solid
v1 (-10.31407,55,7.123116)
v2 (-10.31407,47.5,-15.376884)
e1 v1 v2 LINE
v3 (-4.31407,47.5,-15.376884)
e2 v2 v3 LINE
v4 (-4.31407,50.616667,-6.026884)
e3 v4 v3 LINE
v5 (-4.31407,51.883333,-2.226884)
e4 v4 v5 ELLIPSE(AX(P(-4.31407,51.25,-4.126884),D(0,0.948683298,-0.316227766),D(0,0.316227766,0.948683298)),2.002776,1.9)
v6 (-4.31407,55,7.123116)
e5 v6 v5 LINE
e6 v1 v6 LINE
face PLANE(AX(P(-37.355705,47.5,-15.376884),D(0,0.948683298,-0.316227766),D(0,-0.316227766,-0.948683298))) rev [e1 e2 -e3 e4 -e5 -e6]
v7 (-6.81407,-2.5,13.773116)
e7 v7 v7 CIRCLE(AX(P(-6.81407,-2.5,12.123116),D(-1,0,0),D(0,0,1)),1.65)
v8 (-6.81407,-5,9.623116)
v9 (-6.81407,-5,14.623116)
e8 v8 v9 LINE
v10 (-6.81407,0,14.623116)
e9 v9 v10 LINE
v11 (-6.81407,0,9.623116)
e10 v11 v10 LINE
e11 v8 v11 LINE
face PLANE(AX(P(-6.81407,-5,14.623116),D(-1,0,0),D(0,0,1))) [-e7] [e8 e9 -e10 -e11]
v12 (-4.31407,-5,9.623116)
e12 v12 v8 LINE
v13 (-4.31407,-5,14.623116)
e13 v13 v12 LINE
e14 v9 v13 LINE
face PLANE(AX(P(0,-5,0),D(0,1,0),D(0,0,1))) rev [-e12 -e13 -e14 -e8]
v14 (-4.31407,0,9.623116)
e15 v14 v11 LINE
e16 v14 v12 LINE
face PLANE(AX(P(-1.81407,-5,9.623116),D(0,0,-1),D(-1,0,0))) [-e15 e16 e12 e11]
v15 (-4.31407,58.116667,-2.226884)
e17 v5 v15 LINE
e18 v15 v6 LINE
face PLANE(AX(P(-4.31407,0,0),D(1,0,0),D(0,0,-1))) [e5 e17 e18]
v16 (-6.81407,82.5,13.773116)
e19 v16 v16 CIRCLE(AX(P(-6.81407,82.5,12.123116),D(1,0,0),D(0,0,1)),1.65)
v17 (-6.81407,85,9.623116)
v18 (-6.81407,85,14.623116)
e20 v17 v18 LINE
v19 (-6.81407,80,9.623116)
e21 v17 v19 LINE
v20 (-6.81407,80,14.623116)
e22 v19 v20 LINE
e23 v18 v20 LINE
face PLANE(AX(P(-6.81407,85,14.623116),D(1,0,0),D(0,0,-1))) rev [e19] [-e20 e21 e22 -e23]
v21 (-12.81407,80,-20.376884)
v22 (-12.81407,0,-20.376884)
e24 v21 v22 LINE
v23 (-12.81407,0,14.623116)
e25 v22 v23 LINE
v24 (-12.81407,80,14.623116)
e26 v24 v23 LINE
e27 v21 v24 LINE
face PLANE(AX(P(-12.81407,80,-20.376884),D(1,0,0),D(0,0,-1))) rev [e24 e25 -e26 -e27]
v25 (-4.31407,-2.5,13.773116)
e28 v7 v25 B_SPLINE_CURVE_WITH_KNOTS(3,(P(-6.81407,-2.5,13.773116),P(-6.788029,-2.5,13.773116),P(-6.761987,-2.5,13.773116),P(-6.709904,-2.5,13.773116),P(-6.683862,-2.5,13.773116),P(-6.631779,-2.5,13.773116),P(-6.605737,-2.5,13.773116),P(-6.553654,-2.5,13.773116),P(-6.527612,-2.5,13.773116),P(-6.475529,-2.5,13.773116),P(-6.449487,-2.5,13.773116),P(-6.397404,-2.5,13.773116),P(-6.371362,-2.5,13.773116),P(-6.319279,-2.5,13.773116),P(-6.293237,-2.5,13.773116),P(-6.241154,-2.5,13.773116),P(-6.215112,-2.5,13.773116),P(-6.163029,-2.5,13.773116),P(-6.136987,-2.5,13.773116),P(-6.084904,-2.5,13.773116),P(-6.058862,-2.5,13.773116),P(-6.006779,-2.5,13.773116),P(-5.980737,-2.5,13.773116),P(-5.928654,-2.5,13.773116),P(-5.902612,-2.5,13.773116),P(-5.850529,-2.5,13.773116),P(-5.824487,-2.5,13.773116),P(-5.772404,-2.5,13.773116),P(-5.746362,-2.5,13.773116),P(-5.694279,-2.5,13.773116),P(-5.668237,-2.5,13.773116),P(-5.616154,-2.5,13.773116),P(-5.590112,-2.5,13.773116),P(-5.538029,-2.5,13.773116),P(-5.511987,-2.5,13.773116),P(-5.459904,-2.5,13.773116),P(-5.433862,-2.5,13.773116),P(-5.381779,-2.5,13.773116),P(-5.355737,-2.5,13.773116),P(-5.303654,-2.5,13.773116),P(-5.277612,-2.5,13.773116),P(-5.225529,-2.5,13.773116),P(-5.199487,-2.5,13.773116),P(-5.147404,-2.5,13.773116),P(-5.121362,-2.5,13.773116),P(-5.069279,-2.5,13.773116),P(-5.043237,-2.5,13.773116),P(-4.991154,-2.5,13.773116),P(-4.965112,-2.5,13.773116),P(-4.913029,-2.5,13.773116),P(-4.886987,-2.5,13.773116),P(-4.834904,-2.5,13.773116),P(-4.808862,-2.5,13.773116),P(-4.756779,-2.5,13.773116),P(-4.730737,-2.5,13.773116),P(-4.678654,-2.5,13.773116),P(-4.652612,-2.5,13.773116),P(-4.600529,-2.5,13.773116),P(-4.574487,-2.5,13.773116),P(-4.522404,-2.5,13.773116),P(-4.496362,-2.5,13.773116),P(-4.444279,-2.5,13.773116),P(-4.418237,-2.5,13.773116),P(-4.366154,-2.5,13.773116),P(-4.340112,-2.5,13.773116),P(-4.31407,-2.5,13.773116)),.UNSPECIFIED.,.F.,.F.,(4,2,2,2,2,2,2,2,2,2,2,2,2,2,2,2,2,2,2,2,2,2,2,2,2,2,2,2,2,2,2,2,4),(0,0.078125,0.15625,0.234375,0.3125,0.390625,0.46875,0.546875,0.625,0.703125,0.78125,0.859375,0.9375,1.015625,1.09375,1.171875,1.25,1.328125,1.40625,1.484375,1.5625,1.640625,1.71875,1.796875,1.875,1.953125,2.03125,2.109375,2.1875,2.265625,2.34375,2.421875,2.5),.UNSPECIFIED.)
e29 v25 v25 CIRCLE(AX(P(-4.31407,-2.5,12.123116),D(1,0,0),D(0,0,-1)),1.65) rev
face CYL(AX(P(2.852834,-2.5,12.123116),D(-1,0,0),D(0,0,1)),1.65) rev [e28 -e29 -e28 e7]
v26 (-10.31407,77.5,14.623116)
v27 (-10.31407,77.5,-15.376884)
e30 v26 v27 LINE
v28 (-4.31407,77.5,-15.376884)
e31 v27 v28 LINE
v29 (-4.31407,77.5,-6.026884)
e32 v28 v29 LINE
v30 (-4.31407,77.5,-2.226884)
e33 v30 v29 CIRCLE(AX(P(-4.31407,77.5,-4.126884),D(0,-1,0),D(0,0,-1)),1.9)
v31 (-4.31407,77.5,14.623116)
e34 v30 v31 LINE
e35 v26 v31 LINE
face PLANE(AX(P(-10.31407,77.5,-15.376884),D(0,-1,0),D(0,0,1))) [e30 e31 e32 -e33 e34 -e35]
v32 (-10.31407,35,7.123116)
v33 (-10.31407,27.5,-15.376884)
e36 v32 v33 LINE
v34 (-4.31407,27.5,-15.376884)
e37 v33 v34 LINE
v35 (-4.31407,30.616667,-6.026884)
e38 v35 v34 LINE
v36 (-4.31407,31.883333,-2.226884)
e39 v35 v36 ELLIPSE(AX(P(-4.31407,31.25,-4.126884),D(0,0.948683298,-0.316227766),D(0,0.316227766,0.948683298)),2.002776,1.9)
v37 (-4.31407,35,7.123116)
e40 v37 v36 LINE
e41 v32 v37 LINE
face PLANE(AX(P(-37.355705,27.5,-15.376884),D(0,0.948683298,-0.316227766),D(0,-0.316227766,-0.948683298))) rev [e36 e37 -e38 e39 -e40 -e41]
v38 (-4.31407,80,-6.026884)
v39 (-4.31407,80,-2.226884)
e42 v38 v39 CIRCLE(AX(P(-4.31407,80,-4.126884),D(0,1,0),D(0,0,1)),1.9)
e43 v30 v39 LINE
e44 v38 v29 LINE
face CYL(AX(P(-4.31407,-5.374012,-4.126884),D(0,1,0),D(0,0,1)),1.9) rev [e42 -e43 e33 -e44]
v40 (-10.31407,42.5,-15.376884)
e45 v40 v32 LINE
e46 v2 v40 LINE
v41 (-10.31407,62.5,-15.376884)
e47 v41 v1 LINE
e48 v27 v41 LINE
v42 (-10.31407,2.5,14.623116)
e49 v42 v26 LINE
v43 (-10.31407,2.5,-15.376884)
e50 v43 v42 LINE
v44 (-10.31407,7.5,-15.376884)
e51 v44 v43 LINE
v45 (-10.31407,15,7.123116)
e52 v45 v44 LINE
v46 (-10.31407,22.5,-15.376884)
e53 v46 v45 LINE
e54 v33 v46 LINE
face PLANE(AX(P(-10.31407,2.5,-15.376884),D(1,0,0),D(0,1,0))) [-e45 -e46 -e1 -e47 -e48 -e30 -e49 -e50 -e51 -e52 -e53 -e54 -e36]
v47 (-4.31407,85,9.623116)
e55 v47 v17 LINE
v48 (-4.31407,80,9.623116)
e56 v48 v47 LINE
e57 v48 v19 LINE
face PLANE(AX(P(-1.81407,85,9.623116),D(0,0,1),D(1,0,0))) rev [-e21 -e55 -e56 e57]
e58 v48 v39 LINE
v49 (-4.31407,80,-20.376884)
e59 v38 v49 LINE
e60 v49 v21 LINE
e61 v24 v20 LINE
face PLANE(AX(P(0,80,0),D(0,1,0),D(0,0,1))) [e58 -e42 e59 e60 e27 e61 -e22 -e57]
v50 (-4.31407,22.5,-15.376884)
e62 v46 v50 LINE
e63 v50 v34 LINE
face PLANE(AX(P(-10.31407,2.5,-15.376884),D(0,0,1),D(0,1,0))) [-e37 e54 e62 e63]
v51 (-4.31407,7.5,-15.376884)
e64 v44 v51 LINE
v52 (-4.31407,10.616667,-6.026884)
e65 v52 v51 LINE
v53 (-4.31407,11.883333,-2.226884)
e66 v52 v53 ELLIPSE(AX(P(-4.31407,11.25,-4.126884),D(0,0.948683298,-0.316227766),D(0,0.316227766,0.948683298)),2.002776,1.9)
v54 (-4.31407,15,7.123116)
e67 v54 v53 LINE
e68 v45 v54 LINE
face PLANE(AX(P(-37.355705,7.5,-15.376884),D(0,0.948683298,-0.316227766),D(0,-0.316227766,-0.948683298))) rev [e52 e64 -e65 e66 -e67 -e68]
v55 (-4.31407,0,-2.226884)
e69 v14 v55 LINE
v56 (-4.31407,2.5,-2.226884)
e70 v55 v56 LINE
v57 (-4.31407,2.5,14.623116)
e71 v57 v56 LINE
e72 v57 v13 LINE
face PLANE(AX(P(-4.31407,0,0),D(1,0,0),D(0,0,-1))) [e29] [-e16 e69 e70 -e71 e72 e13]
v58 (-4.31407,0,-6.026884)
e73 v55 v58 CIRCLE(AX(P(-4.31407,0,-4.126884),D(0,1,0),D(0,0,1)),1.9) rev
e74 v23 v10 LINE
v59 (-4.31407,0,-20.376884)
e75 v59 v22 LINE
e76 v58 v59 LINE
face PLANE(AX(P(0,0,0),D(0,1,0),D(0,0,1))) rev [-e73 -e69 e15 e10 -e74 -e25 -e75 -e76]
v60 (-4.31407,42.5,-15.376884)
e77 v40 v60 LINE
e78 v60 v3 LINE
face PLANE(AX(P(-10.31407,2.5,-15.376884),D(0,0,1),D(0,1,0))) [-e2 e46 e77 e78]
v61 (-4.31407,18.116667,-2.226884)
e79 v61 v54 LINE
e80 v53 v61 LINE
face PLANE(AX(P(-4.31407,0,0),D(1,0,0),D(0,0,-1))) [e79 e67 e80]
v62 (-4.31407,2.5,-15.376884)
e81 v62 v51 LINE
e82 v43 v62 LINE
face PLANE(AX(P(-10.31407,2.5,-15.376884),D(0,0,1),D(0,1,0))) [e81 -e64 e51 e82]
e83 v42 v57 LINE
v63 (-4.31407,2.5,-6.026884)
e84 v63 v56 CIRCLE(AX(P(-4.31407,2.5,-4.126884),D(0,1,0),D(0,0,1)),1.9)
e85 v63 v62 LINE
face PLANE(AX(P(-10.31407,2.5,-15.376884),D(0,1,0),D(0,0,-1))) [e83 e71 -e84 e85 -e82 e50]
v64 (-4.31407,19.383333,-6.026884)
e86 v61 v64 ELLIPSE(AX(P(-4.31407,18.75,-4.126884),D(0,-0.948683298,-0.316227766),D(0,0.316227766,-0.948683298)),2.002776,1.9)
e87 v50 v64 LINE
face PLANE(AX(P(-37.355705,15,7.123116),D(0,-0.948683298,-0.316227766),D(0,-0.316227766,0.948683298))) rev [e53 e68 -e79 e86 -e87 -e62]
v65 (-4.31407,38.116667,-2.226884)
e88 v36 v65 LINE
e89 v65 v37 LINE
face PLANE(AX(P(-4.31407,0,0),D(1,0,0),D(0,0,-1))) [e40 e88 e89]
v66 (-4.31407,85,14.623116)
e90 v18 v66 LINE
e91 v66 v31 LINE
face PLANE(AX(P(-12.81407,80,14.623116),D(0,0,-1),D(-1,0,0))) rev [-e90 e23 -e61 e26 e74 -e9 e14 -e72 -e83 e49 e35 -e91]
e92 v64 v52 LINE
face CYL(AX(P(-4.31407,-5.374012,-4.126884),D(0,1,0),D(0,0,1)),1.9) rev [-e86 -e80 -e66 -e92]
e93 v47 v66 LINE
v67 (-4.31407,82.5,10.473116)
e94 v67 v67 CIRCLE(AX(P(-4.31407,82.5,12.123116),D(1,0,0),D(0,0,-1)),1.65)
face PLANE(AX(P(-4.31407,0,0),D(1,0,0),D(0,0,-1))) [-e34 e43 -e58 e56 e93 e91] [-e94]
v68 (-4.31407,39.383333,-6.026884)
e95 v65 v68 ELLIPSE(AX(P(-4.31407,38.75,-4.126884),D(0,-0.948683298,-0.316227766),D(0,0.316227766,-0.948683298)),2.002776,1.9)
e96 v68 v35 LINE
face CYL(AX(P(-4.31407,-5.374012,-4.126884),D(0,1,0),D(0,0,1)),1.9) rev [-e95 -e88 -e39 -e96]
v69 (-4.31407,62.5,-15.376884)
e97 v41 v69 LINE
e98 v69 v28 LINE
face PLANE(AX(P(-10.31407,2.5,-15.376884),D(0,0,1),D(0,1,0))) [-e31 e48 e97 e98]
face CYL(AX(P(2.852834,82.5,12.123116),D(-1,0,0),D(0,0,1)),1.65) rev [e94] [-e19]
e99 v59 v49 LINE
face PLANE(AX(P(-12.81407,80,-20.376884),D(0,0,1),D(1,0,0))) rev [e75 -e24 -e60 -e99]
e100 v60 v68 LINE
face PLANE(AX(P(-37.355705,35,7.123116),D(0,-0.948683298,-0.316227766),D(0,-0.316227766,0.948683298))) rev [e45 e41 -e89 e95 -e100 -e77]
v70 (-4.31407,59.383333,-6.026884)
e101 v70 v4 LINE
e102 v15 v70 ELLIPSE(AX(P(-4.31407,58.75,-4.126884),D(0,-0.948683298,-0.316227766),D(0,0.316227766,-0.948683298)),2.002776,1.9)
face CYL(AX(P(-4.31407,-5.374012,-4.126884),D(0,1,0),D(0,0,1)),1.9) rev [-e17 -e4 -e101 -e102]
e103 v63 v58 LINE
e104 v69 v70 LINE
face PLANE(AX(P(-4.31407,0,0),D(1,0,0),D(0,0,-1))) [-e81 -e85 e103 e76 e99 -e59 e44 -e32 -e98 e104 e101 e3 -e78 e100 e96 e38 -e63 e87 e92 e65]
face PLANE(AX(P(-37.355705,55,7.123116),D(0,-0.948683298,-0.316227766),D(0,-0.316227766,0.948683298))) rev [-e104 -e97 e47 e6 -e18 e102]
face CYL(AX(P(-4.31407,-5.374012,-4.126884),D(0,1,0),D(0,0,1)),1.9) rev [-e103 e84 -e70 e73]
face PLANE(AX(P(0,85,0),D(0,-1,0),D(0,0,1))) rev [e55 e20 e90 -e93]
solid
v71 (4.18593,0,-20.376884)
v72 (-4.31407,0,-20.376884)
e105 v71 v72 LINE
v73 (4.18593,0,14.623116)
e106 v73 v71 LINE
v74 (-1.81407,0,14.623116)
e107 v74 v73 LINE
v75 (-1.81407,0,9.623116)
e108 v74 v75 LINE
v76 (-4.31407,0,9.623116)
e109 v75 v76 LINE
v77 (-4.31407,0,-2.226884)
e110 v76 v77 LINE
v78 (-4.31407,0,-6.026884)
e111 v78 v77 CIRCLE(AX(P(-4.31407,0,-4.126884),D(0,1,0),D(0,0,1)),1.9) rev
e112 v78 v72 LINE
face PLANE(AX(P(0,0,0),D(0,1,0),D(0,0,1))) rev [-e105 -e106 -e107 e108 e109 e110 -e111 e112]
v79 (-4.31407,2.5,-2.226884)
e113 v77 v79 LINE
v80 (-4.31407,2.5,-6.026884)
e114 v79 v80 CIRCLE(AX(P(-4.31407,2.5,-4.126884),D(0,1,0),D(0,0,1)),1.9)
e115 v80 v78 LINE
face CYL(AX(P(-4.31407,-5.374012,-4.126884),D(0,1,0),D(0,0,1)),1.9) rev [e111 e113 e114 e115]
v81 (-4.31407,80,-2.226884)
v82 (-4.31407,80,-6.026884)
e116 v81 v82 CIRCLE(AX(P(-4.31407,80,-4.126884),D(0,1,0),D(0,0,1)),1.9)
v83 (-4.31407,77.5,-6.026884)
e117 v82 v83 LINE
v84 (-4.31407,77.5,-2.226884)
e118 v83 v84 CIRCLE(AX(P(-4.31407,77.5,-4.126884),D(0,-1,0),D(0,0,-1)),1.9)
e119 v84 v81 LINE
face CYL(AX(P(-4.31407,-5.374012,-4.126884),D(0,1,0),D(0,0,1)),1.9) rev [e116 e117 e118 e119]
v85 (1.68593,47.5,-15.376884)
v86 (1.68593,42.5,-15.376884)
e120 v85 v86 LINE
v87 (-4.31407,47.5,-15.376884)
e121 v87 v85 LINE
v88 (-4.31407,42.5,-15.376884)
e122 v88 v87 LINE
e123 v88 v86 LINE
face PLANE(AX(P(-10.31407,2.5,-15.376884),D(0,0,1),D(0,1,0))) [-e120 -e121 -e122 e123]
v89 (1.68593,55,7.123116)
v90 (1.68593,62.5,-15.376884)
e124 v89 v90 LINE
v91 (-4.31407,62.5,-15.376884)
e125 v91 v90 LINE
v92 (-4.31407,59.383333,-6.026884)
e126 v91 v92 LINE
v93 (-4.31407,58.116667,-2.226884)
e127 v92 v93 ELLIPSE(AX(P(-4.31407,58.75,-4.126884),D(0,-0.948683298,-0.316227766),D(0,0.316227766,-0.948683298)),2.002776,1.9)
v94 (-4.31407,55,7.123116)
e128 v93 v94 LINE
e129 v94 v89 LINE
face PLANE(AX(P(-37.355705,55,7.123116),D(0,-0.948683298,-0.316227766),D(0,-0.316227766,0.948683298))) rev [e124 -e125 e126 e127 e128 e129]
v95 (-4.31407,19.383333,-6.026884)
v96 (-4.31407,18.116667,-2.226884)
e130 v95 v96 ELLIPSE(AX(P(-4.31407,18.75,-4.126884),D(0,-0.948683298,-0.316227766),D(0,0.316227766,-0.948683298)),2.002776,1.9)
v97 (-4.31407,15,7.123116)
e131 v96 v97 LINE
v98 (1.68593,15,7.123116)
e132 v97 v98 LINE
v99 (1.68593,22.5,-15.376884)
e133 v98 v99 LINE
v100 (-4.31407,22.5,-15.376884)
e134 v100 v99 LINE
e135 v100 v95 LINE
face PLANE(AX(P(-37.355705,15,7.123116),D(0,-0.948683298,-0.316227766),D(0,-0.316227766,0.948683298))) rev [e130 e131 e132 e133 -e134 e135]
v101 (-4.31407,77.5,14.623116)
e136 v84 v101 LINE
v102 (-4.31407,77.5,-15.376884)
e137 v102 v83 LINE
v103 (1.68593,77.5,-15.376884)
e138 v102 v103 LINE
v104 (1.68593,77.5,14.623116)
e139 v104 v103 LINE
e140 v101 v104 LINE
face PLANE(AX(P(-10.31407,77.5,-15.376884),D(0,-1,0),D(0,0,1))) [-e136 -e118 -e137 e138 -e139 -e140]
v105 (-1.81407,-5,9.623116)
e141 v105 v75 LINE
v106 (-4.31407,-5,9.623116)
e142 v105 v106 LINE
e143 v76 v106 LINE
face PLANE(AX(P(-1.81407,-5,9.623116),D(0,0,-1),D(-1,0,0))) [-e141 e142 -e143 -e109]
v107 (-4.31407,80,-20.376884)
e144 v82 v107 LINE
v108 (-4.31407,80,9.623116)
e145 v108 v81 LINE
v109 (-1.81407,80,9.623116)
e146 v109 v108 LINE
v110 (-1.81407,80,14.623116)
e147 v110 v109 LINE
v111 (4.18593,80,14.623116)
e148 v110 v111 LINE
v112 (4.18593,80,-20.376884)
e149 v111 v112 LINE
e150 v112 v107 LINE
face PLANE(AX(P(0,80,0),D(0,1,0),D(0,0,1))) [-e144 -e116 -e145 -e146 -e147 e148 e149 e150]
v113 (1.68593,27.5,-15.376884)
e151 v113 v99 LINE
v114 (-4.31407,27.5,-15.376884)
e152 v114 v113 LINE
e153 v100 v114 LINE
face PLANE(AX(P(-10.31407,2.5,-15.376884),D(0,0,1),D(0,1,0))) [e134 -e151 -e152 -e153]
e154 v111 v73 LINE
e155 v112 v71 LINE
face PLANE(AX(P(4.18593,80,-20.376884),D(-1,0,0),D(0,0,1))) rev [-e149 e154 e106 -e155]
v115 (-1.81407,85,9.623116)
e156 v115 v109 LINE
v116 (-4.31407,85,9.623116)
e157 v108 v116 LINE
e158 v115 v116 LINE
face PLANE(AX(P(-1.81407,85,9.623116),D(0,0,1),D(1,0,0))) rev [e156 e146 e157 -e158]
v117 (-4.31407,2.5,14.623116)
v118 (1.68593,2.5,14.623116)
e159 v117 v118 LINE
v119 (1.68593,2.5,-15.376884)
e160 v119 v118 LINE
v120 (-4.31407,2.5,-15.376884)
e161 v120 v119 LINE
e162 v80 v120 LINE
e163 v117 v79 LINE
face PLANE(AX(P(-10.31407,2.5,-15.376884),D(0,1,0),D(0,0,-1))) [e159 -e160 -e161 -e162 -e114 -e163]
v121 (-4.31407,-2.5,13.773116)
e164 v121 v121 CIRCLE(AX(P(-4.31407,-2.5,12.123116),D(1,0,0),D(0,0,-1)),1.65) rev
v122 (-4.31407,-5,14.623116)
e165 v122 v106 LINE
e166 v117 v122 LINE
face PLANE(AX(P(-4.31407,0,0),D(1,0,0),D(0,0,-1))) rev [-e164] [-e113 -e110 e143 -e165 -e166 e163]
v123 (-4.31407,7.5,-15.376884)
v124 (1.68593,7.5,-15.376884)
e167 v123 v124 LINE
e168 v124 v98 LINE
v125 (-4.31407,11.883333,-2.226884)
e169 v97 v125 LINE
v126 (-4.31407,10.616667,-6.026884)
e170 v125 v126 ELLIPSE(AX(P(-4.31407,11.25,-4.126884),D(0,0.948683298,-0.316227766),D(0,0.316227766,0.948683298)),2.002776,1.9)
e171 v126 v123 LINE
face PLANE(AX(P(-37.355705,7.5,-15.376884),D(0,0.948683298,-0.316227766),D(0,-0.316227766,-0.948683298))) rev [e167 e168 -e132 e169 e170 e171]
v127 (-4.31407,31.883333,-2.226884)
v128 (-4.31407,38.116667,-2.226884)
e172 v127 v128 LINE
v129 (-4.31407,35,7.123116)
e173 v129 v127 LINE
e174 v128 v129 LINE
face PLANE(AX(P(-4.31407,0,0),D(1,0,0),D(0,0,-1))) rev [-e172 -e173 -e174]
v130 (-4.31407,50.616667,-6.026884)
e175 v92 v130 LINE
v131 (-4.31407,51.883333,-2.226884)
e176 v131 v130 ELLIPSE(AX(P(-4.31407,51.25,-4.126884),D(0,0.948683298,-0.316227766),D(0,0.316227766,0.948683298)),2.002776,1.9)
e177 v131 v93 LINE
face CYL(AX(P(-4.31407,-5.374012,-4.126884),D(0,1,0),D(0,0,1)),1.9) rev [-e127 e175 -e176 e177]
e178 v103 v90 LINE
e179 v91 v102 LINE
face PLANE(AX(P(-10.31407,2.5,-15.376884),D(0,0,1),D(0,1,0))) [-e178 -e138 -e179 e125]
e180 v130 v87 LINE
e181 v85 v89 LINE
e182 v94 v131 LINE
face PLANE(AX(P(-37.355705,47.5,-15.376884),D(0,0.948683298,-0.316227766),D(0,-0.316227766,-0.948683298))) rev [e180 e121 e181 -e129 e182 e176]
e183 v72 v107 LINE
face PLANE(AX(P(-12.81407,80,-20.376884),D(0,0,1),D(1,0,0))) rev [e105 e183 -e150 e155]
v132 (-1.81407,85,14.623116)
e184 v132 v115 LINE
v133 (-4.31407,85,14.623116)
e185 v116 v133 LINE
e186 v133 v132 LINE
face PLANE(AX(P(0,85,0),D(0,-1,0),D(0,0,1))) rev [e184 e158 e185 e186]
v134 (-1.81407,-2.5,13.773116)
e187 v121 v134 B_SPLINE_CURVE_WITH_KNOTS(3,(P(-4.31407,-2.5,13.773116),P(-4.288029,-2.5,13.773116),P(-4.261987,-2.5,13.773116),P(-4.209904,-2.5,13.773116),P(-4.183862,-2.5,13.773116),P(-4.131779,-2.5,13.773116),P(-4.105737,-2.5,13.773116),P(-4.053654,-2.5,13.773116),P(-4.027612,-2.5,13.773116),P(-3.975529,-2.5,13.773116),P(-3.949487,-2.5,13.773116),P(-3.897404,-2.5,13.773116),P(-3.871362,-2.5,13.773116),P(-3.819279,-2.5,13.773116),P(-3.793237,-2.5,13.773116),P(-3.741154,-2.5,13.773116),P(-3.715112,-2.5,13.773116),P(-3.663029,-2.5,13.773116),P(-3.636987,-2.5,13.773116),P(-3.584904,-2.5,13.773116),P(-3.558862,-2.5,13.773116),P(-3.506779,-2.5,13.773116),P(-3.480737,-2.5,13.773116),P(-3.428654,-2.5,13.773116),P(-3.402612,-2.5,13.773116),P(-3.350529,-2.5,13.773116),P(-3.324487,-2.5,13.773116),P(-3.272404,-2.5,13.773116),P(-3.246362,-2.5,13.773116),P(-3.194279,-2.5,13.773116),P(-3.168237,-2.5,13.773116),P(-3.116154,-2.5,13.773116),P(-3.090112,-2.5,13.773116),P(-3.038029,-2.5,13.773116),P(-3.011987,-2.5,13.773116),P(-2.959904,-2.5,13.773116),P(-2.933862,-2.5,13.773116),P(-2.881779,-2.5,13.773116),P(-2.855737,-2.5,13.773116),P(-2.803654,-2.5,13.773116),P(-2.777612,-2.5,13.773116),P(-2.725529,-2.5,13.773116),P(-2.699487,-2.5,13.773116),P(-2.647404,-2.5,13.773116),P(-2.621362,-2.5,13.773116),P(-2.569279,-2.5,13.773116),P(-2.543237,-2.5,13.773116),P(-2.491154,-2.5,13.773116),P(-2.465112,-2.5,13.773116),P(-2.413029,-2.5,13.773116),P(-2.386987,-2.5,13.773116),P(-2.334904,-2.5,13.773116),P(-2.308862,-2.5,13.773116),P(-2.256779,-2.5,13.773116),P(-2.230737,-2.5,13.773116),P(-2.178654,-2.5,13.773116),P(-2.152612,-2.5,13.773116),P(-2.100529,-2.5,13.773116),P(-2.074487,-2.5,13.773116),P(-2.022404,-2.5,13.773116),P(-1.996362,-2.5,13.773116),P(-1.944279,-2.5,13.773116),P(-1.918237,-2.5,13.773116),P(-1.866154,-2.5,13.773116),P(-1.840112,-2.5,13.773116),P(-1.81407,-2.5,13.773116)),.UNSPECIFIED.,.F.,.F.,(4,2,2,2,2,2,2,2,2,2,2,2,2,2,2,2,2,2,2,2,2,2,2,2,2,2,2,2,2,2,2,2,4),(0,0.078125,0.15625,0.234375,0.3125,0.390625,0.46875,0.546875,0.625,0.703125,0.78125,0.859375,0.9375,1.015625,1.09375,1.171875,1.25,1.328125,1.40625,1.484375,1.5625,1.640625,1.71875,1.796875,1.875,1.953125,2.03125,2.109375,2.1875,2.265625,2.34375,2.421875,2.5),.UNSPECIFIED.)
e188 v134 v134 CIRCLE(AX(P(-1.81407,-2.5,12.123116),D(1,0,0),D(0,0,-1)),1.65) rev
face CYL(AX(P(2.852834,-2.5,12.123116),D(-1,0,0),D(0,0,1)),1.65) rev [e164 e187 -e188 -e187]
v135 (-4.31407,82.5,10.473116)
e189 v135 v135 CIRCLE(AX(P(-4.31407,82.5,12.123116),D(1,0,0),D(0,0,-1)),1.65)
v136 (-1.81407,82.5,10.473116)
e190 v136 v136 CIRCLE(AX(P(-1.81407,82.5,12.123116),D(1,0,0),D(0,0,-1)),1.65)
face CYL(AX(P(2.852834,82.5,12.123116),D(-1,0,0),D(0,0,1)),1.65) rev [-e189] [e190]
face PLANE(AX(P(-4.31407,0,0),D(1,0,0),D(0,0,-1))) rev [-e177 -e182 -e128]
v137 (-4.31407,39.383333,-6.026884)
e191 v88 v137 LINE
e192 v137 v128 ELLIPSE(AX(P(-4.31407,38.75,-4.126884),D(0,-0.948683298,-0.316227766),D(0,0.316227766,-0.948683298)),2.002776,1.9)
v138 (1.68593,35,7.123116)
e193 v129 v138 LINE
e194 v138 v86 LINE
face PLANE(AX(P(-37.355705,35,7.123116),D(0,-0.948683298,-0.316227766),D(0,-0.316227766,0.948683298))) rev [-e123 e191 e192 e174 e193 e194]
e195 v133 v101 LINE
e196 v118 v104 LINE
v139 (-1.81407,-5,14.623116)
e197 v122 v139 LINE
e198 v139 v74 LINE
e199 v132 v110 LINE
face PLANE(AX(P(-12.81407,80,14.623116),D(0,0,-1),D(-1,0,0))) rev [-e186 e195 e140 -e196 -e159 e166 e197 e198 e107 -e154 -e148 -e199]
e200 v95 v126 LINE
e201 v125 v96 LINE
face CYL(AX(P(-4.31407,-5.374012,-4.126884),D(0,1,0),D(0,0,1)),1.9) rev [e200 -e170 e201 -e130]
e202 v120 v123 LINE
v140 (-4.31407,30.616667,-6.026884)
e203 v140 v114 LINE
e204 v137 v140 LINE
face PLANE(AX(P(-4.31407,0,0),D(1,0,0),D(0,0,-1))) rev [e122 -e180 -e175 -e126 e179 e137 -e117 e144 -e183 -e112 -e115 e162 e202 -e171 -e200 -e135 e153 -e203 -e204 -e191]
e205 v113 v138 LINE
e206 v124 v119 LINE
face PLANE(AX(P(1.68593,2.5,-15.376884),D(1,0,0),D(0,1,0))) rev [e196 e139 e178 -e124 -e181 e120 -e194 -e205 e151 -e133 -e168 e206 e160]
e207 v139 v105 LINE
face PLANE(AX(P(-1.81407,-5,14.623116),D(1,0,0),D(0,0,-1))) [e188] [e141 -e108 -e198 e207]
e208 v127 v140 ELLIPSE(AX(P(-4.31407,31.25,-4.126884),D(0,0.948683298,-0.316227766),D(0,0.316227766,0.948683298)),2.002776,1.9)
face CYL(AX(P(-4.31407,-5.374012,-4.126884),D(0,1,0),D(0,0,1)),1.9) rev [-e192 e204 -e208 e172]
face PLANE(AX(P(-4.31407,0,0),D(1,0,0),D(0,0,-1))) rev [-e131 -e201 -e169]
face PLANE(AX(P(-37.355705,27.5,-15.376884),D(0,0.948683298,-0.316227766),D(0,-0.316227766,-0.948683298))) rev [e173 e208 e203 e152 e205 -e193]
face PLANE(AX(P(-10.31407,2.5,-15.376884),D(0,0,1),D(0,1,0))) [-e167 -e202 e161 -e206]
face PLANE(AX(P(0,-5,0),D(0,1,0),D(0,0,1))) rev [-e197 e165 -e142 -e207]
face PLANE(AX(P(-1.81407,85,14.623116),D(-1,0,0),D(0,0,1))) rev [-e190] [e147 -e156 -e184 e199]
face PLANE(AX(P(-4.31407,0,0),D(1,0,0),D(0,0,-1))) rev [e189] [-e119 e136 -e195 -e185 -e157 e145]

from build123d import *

# Parameters (mm, degrees)
SKETCH1_W           = 17
SKETCH1_H           = 35
BOSS_EXTRUDE1_DEPTH = 80
CAVITY1_START       = -10.314070352
CAVITY1_DEPTH       = 12
SKETCH2_W           = 5
SKETCH2_H           = 5
BOSS_EXTRUDE2_DEPTH = 5
SKETCH3_R           = 1.65
CUT_EXTRUDE1_DEPTH  = 5
CUT_EXTRUDE2_REACH  = 90.343
SKETCH4_R           = 1.9


# Read off the part's stored shape, not the designer's step: Cavity1
with BuildPart() as part:
    # Sketch1 → Boss-Extrude1 (new body)
    with BuildSketch(Plane(origin=(0, 0, 0), x_dir=(1, 0, 0), z_dir=(0, 1, 0))):
        with Locations((-4.314070352, 2.876884422)):
            Rectangle(SKETCH1_W, SKETCH1_H)
    extrude(amount=BOSS_EXTRUDE1_DEPTH)

    # Cavity1 outline → Cavity1 (cut)
    with BuildSketch(Plane.YZ.offset(CAVITY1_START)):
        Polygon((42.5, -15.376884422), (47.5, -15.376884422), (55, 7.123115578), (62.5, -15.376884422), (77.5, -15.376884422), (77.5, 14.623115578), (2.5, 14.623115578), (2.5, -15.376884422), (7.5, -15.376884422), (15, 7.123115578), (22.5, -15.376884422), (27.5, -15.376884422), (35, 7.123115578), align=None)
    extrude(amount=CAVITY1_DEPTH, mode=Mode.SUBTRACT)

    # Sketch2 → Boss-Extrude2 (add)
    with BuildSketch(Plane(origin=(0, 0, 0), x_dir=(1, 0, 0), z_dir=(0, 1, 0))):
        with Locations((-4.314070352, -12.123115578)):
            Rectangle(SKETCH2_W, SKETCH2_H)
    boss_extrude2 = extrude(amount=-BOSS_EXTRUDE2_DEPTH)

    # Sketch3 → Cut-Extrude1 (cut)
    with BuildSketch(Plane.ZY.offset(6.814070352)):
        with Locations((12.123115578, -2.5)):
            Circle(SKETCH3_R)
    cut_extrude1 = extrude(amount=-CUT_EXTRUDE1_DEPTH, mode=Mode.SUBTRACT)

    # Cut-Extrude2: up to this face of the body (flat: up to its plane)
    cut_extrude2_end = Plane(part.part.faces().sort_by_distance((-4.314070352, 0, -3.534779159))[0])
    # Sketch4 → Cut-Extrude2 (cut, up to the picked face)
    with BuildSketch(Plane(origin=(0, 80, 0), x_dir=(1, 0, 0), z_dir=(0, 1, 0)), mode=Mode.PRIVATE) as cut_extrude2_sk1:
        with Locations(Location((-4.314070352, 4.126884422, 0), (0, 0, 270))):
            Circle(SKETCH4_R)
    cut_extrude2_tool1 = split(extrude(cut_extrude2_sk1.sketch, amount=-CUT_EXTRUDE2_REACH, mode=Mode.PRIVATE), bisect_by=cut_extrude2_end, keep=Keep.BOTH, mode=Mode.PRIVATE)
    add(cut_extrude2_tool1.solids().sort_by(Axis((-4.31407, 80, -4.126884), (0, -1, 0)))[0], mode=Mode.SUBTRACT)

    # Mirror1: Boss-Extrude2, Cut-Extrude1 across plane
    add(boss_extrude2.mirror(Plane.ZX.offset(40)))
    add(cut_extrude1.mirror(Plane.ZX.offset(40)), mode=Mode.SUBTRACT)


with BuildPart() as body_2:
    # Split1: the piece on the far side of the plane
    add(part.part)
    split(bisect_by=Plane(origin=(-4.314070352, 0, 0), x_dir=(0, 0, 1), z_dir=(1, 0, 0)), keep=Keep.BOTTOM)


with BuildPart() as part_1:
    add(part.part)

    # Split1
    split(bisect_by=Plane(origin=(-4.314070352, 0, 0), x_dir=(0, 0, 1), z_dir=(1, 0, 0)), keep=Keep.TOP)


solid = Compound([body_2.part, part_1.part])
